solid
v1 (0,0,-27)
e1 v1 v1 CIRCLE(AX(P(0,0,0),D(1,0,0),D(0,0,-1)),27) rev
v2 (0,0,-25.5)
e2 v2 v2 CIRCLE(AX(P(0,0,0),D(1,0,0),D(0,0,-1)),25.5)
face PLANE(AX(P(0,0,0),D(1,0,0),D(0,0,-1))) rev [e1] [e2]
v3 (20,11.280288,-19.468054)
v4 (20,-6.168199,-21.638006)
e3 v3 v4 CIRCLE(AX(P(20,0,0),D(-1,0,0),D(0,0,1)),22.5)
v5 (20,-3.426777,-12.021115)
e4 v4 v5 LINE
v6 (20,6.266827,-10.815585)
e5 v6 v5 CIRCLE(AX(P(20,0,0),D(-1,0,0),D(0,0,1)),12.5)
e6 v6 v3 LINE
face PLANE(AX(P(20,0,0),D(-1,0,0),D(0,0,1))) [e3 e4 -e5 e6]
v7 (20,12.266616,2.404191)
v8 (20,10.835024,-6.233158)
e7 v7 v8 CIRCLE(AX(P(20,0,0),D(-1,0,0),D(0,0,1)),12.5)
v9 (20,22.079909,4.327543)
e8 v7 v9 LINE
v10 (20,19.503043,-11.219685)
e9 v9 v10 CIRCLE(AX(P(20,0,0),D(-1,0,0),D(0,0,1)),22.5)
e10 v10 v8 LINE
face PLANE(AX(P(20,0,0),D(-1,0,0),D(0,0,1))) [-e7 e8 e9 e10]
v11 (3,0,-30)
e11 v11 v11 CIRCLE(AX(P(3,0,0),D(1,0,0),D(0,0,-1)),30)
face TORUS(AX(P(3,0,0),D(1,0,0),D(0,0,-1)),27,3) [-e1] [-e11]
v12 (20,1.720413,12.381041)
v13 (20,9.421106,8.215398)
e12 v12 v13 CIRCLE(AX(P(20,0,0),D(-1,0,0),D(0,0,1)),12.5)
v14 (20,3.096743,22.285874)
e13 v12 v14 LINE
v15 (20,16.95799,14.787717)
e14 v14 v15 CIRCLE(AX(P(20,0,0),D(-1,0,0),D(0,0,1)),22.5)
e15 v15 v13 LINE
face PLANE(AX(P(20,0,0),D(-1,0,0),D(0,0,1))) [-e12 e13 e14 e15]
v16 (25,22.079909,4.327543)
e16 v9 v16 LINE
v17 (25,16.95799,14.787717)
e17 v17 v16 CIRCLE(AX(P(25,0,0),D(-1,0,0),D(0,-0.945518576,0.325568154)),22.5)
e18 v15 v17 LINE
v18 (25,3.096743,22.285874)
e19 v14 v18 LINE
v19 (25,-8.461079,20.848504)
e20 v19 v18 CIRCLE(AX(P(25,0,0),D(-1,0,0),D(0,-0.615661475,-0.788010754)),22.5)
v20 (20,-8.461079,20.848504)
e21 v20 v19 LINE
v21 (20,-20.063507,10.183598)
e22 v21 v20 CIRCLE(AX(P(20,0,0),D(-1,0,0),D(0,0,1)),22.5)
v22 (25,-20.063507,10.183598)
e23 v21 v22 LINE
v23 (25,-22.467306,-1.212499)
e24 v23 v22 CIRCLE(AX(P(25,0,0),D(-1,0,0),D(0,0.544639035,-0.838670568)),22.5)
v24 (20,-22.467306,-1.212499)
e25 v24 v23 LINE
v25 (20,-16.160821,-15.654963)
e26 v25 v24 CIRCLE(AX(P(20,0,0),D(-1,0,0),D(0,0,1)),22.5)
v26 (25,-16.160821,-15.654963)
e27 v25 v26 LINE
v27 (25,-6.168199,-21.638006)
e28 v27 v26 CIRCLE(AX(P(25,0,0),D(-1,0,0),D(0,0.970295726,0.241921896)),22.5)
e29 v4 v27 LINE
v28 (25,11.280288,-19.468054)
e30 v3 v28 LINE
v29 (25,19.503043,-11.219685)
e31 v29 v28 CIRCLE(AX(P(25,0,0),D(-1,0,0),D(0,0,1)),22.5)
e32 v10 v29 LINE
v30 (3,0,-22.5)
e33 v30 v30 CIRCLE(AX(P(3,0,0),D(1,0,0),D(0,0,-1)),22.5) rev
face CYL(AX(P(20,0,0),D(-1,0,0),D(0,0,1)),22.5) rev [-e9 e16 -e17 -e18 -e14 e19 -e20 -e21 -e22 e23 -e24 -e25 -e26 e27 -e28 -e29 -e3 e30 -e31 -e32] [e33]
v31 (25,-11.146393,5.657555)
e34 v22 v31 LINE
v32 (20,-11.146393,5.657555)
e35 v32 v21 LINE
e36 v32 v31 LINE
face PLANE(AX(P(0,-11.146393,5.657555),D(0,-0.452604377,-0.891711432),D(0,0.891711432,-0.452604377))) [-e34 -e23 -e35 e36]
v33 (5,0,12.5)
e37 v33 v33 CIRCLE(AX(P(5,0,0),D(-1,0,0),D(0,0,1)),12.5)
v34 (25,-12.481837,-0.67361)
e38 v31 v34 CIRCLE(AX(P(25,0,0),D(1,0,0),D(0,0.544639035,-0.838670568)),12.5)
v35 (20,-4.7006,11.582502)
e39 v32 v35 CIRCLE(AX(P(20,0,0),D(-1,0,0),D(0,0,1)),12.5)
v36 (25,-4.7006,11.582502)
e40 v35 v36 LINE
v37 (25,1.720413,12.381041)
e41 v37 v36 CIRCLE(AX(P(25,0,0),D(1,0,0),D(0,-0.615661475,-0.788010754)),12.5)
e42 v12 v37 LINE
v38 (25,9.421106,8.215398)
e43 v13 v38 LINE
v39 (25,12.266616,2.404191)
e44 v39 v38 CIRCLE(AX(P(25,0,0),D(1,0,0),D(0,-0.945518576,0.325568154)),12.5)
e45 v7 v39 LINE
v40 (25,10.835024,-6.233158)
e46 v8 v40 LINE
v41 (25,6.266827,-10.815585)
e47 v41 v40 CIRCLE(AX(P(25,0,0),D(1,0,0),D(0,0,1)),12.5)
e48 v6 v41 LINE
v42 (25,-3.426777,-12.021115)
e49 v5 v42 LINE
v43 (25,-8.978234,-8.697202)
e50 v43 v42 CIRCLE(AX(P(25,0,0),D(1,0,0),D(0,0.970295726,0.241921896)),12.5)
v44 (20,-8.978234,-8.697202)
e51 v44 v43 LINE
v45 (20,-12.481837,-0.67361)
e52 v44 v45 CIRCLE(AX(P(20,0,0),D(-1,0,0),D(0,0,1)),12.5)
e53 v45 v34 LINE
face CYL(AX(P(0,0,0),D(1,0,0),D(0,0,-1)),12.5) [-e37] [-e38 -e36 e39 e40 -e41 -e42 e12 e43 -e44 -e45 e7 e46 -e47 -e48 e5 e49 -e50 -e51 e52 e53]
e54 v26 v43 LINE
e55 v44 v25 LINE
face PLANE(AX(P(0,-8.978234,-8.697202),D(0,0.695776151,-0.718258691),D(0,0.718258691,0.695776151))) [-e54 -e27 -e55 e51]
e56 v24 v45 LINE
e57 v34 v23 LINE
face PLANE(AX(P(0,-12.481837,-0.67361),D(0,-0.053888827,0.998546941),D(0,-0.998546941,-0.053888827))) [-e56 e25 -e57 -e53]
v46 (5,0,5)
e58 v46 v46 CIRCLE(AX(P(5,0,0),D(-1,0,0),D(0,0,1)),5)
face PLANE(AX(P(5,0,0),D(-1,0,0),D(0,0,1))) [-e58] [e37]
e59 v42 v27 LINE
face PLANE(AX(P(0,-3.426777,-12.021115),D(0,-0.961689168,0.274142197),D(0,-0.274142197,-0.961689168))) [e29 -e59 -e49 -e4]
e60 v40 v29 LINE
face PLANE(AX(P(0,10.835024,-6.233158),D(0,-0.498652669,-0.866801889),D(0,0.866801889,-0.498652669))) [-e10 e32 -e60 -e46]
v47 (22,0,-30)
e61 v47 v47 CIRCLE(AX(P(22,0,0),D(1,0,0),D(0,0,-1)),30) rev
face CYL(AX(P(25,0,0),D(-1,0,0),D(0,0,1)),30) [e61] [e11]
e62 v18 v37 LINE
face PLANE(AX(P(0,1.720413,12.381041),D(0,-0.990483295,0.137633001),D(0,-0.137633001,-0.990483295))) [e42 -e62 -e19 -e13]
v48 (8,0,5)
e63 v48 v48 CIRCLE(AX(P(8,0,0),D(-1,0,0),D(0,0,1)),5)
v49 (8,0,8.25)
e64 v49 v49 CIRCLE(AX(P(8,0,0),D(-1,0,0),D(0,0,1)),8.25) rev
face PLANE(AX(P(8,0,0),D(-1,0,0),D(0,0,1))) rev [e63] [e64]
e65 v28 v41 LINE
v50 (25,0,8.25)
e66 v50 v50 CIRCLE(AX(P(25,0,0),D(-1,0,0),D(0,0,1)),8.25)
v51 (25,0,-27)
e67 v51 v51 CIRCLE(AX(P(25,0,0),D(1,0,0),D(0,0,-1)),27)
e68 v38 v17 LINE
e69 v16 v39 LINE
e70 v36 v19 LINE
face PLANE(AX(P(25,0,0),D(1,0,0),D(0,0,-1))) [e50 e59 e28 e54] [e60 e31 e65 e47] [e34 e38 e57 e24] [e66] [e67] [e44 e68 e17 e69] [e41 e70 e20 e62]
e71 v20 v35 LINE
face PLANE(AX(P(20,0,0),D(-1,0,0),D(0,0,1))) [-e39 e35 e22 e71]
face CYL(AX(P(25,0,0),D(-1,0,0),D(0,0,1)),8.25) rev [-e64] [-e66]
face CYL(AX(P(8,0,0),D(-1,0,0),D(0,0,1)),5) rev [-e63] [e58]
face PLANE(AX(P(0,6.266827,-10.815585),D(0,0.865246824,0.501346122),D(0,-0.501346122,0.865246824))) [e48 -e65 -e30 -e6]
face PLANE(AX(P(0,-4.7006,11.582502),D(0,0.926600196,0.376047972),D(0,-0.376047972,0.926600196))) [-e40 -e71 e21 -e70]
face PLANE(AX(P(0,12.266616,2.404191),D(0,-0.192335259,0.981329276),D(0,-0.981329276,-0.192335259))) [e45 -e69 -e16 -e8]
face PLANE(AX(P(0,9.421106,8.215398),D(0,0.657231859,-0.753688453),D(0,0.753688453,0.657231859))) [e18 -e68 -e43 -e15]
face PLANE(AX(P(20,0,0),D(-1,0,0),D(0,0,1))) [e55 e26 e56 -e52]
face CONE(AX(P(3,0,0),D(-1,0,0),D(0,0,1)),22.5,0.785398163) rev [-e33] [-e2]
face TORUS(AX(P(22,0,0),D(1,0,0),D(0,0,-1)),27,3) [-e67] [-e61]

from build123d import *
from build123d.topology import SkipClean

# Parameters (mm, degrees)
SKETCH1_R           = 30
BOSS_EXTRUDE1_DEPTH = 25
FILLET1_R           = 3
SKETCH3_R           = 22.5
CUT_EXTRUDE1_DEPTH  = 20
CHAMFER1_SIZE       = 3
CUT_EXTRUDE2_DEPTH  = 50.244289131
CIRPATTERN1_COUNT   = 5
CIRPATTERN1_ANGLE   = 284
SKETCH4_R           = 12.5
BOSS_EXTRUDE2_DEPTH = 15
SKETCH5_R           = 8.25
CUT_EXTRUDE3_DEPTH  = 47.904157726
SKETCH6_R           = 10
SKETCH6_R_2         = 5
BOSS_EXTRUDE3_DEPTH = 3


with BuildPart() as part:
    # Sketch1 → Boss-Extrude1 (new body)
    with BuildSketch(Plane(origin=(0, 0, 0), x_dir=(0, 0, -1), z_dir=(1, 0, 0))):
        Circle(SKETCH1_R)
    extrude(amount=BOSS_EXTRUDE1_DEPTH)

    # Fillet1
    fillet1_edges = [part.edges().sort_by_distance(p)[0] for p in [
        (0, 0, 30),
        (25, 0, 30),
    ]]
    fillet(fillet1_edges, radius=FILLET1_R)

    # Sketch3 → Cut-Extrude1 (cut)
    with BuildSketch(Plane.ZY):
        Circle(SKETCH3_R)
    extrude(amount=-CUT_EXTRUDE1_DEPTH, mode=Mode.SUBTRACT)

    # Chamfer1
    chamfer1_edges = [part.edges().sort_by_distance(p)[0] for p in [
        (0, 0, -22.5),
    ]]
    chamfer(chamfer1_edges, length=CHAMFER1_SIZE)

    # Sketch2 → Cut-Extrude2 (cut, through all)
    with BuildSketch(Plane.ZY.offset(-25)):
        with BuildLine():
            Line((-6.233158363, 10.835023619), (-11.219685054, 19.503042514))
            ThreePointArc((-11.219685054, 19.503042514), (-15.885142396, 15.934624283), (-19.468053536, 11.280287741))
            Line((-19.468053536, 11.280287741), (-10.815585298, 6.266826523))
            ThreePointArc((-10.815585298, 6.266826523), (-8.825079109, 8.852569046), (-6.233158363, 10.835023619))
        make_face()
    cut_extrude2 = extrude(amount=CUT_EXTRUDE2_DEPTH, mode=Mode.SUBTRACT)

    # CirPattern1: Cut-Extrude2 ×5 about axis
    with SkipClean():  # the faces are left unmerged after this step: merging them gives an invalid solid
        cirpattern1_axis = Axis((25, 0, 0), (1, 0, 0))
        for i in range(1, CIRPATTERN1_COUNT):
            add(cut_extrude2.rotate(cirpattern1_axis, i * CIRPATTERN1_ANGLE / (CIRPATTERN1_COUNT - 1)), mode=Mode.SUBTRACT)
    add(part.part.scale(1), mode=Mode.REPLACE)  # the faces are merged on a copy

    # Sketch4 → Boss-Extrude2 (add)
    with BuildSketch(Plane.ZY.offset(-20)):
        Circle(SKETCH4_R)
    extrude(amount=BOSS_EXTRUDE2_DEPTH)

    # Sketch5 → Cut-Extrude3 (cut, through all)
    with BuildSketch(Plane.ZY.offset(-5)):
        Circle(SKETCH5_R)
    extrude(amount=-CUT_EXTRUDE3_DEPTH, mode=Mode.SUBTRACT)

    # Sketch6 → Boss-Extrude3 (add)
    with BuildSketch(Plane.ZY.offset(-5)):
        Circle(SKETCH6_R)
        Circle(SKETCH6_R_2, mode=Mode.SUBTRACT)
    extrude(amount=-BOSS_EXTRUDE3_DEPTH)


solid = part.part
